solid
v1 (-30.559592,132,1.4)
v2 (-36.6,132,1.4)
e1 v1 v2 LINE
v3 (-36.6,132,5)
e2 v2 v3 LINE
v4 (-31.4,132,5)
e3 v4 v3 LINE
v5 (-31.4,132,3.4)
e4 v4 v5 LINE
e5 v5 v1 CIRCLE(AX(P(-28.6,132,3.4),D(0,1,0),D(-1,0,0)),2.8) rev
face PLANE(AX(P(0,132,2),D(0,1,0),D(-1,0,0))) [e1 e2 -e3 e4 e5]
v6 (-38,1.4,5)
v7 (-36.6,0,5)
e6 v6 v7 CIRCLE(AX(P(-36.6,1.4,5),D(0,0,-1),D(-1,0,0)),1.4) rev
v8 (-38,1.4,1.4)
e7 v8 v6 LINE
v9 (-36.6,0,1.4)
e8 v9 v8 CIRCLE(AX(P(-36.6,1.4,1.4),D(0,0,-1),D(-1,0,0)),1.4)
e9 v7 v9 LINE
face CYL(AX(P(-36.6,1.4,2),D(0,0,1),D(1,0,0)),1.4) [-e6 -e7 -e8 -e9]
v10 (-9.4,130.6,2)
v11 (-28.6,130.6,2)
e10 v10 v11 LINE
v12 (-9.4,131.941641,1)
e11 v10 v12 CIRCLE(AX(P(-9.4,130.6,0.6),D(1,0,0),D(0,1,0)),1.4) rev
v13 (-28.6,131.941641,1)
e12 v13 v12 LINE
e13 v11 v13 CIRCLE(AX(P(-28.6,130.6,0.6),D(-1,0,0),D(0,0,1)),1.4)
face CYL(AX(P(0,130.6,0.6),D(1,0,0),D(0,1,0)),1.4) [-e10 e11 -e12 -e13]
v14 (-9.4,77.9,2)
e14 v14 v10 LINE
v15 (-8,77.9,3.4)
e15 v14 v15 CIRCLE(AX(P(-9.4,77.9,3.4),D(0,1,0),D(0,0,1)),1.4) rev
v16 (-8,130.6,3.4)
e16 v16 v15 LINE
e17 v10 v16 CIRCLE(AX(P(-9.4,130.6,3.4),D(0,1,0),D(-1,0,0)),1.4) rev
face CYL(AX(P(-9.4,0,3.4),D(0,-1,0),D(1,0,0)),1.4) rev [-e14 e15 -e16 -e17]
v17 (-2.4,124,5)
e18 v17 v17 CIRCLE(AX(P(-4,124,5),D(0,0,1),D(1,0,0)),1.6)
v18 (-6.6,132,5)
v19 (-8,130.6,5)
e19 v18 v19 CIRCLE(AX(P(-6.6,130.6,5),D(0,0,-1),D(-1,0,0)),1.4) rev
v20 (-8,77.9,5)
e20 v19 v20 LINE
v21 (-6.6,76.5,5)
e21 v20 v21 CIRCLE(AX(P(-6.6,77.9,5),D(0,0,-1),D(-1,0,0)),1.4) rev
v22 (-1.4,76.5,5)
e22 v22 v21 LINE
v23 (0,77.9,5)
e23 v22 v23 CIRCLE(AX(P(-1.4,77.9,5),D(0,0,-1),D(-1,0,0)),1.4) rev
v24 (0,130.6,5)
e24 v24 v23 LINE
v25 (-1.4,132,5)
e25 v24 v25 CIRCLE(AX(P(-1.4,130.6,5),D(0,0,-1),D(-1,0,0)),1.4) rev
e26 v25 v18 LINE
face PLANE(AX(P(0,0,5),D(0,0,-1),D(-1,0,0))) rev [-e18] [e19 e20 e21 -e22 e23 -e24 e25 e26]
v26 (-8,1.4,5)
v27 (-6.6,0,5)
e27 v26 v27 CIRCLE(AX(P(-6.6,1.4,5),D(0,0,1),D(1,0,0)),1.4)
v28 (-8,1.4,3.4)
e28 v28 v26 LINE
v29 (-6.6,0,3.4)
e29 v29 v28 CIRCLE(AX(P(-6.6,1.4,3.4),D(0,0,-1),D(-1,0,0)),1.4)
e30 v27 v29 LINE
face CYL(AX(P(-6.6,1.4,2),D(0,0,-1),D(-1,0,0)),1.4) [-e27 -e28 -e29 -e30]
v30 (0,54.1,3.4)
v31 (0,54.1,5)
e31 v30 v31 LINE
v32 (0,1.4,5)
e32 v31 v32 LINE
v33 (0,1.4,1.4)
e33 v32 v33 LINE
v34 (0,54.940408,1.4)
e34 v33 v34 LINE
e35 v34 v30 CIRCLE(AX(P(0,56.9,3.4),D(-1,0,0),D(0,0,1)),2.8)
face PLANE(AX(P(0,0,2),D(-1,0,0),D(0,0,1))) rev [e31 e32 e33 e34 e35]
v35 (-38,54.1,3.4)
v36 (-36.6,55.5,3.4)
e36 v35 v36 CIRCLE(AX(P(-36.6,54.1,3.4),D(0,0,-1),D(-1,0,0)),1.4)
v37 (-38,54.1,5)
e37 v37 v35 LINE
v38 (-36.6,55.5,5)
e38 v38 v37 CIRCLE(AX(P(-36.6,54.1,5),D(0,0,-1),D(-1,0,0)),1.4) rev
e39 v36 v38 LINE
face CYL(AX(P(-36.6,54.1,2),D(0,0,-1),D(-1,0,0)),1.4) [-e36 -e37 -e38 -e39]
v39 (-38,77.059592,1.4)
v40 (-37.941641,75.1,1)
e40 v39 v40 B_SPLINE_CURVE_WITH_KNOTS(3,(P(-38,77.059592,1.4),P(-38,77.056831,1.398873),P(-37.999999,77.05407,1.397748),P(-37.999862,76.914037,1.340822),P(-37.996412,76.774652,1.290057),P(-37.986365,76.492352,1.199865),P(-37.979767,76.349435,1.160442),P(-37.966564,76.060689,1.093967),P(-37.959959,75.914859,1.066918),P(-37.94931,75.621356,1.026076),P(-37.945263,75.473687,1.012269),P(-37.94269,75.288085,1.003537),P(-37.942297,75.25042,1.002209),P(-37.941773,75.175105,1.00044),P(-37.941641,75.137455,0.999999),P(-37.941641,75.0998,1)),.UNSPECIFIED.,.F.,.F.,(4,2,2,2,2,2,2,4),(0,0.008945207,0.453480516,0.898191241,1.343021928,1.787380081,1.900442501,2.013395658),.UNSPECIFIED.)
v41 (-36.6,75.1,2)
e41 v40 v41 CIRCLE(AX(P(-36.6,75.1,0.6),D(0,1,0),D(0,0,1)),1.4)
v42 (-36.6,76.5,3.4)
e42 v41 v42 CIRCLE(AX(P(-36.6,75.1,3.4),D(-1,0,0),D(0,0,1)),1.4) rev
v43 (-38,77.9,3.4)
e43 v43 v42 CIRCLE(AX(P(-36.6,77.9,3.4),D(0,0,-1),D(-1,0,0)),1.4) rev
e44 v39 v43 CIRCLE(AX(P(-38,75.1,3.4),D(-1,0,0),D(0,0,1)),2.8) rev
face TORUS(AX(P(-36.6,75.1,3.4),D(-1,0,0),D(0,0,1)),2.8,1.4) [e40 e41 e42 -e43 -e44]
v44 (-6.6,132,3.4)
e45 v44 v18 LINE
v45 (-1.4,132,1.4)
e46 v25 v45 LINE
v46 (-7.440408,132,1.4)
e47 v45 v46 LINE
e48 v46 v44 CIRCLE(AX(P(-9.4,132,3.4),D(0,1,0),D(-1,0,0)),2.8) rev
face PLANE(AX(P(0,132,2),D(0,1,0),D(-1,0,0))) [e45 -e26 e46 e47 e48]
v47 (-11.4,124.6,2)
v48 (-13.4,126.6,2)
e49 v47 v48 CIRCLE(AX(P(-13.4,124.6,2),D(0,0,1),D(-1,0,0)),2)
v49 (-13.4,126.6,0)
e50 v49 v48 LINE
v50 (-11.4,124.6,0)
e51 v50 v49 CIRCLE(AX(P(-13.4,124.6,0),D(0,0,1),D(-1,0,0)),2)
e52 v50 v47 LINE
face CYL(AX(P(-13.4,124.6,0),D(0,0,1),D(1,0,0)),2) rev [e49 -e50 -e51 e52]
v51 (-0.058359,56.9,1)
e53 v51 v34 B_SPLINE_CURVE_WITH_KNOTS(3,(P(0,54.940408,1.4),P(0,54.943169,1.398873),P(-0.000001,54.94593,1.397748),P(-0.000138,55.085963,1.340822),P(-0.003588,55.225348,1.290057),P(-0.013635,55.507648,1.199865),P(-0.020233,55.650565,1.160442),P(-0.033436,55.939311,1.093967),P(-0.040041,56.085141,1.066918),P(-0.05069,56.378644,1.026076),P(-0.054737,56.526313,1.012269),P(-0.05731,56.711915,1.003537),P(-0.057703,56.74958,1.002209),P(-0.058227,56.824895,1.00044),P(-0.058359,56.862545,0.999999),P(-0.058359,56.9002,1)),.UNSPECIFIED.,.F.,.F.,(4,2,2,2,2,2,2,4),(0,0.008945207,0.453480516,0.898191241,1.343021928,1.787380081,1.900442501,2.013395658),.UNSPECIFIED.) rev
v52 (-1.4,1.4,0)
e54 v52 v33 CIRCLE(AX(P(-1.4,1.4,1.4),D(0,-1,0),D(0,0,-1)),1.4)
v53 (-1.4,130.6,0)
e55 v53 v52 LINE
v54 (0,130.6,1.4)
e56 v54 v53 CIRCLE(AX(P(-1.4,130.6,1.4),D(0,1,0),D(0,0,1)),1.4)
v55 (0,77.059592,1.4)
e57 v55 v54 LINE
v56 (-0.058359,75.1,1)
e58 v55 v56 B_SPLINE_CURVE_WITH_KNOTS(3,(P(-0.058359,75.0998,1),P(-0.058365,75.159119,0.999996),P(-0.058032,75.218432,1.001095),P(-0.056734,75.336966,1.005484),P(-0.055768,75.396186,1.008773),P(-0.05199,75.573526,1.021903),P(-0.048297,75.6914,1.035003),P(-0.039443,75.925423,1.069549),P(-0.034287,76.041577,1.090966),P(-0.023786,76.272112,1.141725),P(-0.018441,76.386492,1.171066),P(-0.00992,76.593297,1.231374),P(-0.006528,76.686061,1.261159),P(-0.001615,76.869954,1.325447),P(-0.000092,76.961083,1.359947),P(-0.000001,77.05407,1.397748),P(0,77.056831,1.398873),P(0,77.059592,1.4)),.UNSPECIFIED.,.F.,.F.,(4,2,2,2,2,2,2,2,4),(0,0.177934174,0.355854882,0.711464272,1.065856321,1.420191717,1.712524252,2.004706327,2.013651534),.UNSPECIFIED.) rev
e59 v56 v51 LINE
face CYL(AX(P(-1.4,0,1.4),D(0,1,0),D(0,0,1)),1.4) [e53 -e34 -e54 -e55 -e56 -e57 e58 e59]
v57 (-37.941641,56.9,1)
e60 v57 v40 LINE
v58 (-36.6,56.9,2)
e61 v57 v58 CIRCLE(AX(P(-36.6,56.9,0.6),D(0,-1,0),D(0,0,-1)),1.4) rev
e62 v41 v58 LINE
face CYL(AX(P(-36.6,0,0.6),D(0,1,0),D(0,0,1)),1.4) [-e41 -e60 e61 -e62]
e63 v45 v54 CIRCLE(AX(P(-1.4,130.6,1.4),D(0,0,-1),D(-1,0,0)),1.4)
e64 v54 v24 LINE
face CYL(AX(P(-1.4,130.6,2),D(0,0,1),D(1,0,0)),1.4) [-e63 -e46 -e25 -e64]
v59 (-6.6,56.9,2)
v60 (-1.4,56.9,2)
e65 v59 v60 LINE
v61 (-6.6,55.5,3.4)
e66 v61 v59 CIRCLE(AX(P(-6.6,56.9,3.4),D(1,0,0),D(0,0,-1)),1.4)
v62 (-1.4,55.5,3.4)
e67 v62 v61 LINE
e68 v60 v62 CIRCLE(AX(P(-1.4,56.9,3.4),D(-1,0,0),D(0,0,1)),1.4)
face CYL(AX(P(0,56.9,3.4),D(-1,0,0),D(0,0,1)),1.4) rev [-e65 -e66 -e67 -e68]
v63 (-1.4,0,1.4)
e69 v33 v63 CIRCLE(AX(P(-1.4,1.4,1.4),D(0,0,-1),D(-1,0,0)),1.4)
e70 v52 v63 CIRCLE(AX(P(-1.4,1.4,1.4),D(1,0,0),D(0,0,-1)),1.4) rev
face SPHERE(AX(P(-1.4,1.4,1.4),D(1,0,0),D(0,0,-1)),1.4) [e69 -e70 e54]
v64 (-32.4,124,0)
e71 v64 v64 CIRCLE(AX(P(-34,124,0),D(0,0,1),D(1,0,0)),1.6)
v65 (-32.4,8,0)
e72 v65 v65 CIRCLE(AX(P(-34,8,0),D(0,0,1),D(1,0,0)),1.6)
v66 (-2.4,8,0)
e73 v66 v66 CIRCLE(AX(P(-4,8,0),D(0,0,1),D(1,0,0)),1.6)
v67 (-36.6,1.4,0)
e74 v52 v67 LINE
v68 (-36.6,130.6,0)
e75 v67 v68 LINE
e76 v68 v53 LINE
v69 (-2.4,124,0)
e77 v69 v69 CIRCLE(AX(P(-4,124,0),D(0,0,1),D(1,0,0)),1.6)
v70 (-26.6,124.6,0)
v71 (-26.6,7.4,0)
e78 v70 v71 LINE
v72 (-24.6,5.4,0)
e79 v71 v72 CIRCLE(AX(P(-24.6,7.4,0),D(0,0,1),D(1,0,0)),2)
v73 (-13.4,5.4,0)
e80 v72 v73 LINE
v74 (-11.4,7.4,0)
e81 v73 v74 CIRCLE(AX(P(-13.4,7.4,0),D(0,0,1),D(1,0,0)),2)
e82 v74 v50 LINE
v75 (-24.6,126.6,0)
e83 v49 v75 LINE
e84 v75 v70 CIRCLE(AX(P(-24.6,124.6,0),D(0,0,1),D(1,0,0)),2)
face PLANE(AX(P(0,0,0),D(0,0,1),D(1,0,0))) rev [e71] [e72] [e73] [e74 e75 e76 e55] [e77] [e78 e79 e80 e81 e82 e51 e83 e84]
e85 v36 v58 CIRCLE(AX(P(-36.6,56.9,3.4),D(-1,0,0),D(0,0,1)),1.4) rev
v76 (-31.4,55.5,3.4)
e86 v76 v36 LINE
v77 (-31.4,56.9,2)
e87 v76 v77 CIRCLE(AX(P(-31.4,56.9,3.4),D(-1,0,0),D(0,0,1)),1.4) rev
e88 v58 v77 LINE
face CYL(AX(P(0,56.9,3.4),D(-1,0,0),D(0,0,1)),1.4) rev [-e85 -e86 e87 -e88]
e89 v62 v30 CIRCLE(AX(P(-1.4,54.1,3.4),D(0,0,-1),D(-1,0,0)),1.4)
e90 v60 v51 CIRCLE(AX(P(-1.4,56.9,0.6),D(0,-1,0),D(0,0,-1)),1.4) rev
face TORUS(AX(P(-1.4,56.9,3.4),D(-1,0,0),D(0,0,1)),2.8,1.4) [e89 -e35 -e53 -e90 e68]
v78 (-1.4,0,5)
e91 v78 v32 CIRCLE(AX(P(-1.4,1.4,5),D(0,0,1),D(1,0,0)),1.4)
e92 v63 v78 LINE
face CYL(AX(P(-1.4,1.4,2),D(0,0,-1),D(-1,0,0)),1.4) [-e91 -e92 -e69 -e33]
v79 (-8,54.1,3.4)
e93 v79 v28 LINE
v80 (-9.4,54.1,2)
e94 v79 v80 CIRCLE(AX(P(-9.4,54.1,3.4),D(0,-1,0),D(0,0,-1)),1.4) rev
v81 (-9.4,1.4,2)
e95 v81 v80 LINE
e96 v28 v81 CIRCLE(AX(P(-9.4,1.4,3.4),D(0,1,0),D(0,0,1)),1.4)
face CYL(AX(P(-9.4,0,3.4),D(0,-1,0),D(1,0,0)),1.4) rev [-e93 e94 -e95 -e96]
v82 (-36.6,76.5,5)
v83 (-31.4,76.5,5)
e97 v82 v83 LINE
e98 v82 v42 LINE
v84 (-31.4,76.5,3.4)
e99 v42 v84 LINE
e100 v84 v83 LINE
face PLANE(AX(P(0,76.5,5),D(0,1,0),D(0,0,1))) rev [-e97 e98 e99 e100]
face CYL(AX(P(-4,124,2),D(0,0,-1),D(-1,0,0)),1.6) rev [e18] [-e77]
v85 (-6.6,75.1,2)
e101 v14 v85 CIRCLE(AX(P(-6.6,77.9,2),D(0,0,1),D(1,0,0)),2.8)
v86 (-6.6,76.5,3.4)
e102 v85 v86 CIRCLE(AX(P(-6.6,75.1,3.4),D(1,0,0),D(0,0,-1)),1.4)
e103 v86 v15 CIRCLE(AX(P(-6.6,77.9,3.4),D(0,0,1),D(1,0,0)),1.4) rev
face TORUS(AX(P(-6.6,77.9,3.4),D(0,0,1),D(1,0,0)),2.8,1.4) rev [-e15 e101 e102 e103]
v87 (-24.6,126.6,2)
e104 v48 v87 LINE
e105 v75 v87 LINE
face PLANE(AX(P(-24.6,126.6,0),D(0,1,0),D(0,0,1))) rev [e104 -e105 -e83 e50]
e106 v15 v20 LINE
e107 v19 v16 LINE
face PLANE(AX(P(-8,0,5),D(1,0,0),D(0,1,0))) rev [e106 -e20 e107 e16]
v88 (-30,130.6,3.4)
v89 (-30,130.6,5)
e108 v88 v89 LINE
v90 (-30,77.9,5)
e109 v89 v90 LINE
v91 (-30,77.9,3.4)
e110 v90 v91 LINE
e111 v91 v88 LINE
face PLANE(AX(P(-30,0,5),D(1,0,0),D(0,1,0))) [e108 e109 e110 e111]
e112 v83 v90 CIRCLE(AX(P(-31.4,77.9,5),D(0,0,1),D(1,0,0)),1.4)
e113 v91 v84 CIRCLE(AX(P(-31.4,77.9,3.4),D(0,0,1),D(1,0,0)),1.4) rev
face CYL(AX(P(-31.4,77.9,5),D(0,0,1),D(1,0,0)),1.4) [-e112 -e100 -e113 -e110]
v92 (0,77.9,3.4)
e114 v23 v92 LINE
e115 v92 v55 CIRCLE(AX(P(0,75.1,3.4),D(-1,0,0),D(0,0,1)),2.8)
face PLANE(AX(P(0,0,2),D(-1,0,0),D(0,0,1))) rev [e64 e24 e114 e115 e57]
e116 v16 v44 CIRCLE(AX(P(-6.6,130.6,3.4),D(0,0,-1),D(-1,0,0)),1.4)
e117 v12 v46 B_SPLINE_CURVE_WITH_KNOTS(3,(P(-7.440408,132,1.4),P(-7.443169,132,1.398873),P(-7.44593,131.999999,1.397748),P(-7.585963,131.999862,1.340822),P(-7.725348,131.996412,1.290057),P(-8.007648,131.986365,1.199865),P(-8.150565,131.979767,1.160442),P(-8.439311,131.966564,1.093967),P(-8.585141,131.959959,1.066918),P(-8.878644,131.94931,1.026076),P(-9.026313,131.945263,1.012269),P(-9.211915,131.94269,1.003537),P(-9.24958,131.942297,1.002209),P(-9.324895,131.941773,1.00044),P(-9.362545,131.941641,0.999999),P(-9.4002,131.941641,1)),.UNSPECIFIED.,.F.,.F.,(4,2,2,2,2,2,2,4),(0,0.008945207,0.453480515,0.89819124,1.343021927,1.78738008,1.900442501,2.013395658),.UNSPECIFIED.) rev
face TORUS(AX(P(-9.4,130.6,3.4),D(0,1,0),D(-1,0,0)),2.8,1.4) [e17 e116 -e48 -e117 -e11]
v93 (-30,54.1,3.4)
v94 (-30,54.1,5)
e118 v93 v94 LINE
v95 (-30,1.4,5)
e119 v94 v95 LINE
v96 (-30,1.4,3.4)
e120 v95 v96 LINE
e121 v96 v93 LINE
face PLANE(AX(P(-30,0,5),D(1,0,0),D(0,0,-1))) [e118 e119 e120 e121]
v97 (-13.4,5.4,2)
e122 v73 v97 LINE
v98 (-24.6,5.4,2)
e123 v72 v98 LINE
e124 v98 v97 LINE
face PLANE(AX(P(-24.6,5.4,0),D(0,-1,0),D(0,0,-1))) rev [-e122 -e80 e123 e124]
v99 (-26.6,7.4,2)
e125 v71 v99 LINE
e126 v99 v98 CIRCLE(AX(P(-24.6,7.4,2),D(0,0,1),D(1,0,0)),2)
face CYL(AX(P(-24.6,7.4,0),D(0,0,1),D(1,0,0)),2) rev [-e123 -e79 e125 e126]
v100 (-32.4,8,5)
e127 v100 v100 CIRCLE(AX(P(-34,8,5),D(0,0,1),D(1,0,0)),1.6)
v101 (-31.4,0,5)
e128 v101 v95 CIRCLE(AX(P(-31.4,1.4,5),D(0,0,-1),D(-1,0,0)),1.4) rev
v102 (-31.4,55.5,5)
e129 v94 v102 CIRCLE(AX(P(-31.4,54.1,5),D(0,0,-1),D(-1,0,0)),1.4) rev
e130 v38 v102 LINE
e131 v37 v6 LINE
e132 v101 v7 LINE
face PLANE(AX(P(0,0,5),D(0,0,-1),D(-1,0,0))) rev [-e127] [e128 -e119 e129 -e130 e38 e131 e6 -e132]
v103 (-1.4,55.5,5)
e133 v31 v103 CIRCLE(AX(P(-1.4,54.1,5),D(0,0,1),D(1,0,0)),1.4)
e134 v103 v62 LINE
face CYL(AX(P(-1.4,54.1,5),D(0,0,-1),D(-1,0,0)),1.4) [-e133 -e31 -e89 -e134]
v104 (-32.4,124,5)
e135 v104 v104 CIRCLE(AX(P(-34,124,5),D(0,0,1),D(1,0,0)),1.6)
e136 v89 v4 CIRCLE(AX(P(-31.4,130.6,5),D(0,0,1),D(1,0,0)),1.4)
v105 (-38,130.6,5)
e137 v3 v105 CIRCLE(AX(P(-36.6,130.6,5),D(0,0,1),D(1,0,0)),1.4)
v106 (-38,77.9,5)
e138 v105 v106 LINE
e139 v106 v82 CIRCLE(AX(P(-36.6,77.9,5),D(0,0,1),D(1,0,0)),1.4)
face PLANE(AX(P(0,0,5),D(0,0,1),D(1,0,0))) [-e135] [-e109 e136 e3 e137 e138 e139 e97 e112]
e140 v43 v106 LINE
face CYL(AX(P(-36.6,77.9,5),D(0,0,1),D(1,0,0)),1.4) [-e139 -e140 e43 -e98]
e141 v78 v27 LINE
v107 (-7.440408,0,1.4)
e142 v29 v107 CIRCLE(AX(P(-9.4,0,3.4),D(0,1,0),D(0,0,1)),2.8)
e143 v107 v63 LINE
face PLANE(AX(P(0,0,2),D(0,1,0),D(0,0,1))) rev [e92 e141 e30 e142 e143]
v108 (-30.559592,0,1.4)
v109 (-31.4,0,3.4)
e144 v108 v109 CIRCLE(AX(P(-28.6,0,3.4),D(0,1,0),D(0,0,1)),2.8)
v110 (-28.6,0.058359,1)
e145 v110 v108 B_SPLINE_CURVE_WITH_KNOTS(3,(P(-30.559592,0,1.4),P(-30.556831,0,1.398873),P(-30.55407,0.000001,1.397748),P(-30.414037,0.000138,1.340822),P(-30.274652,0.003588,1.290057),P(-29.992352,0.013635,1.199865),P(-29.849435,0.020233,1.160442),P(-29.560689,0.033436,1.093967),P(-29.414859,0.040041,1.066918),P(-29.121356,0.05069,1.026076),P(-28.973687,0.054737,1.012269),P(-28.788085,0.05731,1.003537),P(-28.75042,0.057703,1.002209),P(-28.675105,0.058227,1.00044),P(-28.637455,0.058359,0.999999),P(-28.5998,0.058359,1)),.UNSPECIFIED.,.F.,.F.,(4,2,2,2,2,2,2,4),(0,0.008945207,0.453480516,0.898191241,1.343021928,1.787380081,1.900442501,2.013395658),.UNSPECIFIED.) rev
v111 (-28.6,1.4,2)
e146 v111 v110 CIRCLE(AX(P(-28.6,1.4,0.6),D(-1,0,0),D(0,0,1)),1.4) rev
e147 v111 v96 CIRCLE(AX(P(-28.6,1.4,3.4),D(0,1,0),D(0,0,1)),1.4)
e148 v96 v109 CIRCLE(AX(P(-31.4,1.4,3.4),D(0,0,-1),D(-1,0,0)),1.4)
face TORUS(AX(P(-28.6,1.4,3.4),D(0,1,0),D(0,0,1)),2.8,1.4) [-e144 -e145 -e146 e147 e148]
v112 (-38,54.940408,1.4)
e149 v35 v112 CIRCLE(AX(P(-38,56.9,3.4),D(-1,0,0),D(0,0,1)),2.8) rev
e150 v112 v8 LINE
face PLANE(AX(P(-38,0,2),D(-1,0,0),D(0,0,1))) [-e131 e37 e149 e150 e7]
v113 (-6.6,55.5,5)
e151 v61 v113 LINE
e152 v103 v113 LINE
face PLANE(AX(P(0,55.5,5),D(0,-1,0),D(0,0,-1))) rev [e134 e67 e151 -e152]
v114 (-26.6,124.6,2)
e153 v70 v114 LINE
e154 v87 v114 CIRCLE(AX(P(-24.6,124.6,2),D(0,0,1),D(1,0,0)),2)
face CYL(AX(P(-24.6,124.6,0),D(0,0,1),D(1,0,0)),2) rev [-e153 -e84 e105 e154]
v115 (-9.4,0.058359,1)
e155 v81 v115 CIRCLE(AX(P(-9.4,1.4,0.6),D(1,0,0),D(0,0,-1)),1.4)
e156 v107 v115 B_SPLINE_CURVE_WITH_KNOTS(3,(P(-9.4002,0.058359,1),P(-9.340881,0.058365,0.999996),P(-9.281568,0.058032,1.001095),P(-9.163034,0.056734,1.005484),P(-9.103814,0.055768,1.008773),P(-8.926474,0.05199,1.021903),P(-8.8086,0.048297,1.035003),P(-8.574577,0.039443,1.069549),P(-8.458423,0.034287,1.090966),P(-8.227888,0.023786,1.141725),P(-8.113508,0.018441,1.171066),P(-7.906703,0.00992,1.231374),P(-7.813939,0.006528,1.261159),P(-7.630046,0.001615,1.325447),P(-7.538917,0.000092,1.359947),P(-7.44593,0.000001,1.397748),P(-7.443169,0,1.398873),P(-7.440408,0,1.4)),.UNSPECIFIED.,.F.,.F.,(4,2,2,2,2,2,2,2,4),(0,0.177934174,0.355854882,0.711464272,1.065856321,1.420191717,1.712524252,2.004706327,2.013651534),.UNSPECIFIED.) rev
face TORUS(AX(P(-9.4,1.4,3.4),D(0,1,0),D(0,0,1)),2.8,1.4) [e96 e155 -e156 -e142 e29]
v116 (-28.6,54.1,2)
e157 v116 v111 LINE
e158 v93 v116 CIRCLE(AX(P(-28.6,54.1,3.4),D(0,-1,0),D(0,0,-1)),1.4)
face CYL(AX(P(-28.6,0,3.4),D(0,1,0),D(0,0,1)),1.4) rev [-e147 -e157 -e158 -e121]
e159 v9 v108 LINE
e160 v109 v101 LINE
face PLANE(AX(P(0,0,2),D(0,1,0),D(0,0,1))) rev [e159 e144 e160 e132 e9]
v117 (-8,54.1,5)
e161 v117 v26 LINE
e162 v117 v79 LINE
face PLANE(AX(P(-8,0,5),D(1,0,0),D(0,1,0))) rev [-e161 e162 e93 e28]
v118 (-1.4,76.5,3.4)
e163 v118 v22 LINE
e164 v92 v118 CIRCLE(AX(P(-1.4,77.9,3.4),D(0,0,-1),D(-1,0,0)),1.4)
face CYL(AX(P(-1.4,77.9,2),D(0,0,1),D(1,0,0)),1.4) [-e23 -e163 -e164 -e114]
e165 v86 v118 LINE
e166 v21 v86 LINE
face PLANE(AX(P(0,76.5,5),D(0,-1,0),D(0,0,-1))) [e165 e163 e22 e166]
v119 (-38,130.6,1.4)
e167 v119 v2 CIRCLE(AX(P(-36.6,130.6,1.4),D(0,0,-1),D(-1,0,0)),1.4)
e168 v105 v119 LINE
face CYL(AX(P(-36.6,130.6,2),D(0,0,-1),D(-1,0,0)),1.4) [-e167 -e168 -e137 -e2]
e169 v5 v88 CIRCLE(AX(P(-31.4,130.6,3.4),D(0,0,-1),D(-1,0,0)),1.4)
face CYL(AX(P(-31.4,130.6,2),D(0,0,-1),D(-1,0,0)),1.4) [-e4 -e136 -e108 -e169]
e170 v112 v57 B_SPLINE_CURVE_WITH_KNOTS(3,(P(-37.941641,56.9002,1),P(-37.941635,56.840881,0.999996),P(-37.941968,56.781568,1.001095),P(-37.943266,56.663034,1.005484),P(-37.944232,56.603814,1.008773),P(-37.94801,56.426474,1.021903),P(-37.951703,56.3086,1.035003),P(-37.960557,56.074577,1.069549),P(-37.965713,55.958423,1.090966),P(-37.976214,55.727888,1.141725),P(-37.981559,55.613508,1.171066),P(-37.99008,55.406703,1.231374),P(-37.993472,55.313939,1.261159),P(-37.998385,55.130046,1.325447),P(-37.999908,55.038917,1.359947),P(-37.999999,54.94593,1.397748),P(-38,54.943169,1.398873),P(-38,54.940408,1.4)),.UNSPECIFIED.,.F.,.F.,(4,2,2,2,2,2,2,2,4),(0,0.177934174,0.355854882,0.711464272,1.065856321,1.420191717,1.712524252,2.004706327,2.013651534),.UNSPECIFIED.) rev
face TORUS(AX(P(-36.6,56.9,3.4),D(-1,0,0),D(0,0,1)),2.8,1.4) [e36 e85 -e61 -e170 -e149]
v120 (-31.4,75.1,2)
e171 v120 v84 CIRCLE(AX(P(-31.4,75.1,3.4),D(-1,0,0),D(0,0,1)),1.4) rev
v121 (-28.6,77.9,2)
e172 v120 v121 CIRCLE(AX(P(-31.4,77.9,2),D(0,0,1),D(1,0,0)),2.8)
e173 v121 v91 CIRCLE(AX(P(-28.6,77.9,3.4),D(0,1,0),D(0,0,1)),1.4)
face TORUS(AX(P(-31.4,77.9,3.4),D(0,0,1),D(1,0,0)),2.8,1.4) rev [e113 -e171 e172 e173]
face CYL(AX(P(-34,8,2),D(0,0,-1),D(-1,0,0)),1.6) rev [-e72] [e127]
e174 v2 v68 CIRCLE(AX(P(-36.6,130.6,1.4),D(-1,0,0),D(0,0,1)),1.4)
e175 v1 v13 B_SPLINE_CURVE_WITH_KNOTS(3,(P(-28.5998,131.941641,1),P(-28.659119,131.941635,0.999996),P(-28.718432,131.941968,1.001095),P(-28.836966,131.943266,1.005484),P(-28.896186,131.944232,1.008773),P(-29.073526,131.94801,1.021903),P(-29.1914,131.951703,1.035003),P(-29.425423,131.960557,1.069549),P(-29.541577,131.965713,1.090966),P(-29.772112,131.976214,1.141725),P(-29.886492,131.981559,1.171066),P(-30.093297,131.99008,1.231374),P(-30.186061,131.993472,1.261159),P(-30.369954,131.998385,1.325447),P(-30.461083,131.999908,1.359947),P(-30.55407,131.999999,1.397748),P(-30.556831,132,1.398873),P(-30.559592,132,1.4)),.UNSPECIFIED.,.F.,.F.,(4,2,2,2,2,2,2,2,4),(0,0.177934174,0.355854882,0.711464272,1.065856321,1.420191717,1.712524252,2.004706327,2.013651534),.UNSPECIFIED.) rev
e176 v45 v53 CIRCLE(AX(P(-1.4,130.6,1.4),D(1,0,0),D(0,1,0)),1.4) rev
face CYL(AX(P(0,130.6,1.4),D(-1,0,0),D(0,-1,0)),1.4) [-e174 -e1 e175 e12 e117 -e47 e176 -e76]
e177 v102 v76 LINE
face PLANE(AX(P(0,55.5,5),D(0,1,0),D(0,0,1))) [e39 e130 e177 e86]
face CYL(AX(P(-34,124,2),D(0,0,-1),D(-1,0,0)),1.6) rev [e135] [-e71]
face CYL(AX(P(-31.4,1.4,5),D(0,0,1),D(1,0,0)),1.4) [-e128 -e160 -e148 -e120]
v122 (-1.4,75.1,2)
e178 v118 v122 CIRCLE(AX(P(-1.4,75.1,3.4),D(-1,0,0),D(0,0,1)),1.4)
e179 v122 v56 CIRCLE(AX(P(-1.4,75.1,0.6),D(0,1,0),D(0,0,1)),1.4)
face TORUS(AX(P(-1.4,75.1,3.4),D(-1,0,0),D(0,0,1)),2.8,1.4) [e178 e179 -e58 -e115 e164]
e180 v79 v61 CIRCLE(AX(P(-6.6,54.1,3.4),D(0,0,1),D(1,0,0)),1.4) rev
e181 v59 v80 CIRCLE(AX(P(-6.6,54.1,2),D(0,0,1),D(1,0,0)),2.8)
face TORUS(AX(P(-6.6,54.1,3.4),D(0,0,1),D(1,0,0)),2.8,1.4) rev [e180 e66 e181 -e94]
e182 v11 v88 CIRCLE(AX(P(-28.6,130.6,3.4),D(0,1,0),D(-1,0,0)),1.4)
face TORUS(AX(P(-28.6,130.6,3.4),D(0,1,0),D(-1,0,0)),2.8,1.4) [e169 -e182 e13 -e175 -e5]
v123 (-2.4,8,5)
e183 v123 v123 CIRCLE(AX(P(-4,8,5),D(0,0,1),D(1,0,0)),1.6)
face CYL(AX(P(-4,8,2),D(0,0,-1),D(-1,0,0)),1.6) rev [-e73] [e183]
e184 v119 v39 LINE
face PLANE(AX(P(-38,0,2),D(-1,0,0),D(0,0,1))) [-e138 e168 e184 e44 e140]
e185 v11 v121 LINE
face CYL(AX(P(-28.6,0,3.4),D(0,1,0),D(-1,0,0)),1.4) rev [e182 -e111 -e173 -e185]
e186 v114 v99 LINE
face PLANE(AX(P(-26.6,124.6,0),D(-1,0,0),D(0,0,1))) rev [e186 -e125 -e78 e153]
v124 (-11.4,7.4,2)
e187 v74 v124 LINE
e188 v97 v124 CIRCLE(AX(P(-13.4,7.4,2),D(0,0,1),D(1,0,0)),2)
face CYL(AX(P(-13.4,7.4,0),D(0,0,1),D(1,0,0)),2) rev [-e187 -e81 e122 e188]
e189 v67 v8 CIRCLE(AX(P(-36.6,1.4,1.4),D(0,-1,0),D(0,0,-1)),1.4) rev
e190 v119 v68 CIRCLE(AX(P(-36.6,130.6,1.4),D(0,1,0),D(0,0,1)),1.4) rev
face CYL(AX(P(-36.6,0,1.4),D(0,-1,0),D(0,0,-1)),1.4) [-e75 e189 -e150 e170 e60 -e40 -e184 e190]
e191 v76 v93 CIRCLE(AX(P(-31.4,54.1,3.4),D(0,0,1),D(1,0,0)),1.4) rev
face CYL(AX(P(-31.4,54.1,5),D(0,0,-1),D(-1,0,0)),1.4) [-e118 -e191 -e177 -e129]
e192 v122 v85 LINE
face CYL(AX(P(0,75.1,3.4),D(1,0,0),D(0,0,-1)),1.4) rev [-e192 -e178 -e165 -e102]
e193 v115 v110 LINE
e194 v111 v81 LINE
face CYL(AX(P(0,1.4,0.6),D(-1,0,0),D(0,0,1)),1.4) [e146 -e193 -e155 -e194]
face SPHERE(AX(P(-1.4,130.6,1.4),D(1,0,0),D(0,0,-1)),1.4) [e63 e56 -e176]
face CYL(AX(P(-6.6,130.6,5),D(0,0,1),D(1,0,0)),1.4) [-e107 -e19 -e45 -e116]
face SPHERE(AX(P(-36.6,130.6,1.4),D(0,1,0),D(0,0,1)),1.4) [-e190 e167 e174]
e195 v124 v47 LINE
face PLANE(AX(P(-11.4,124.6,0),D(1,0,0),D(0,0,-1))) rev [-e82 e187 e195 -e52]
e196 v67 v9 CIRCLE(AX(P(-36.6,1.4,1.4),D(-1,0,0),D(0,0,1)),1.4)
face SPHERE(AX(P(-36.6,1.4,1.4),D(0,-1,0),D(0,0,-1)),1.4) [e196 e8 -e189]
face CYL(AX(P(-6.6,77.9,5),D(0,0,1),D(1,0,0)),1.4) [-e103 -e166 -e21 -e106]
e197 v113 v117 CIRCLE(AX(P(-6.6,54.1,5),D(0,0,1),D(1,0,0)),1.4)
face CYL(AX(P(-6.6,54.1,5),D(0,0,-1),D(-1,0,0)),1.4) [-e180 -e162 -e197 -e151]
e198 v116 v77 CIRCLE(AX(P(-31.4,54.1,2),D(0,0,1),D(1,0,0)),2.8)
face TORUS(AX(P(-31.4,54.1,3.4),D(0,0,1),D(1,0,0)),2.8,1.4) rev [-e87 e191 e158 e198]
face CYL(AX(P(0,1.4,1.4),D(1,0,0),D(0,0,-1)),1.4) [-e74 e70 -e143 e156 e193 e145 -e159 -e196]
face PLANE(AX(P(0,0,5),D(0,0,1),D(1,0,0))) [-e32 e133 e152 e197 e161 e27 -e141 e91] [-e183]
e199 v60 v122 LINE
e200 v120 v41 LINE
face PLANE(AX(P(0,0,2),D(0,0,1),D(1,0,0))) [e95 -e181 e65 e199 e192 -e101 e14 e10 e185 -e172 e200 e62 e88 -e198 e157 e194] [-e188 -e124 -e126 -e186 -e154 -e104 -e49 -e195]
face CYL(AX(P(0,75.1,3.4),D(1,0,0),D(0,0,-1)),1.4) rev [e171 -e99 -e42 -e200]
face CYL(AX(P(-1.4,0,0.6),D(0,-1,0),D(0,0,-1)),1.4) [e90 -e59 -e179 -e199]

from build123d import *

# Parameters (mm, degrees)
SKETCH1_W           = 55.5
SKETCH1_H           = 8
SKETCH1_R           = 1.6
BOSS_EXTRUDE1_DEPTH = 2
BOSS_EXTRUDE2_START = 2
SKETCH1_3_W         = 55.5
SKETCH1_3_H         = 8
SKETCH1_3_R         = 1.6
BOSS_EXTRUDE2_DEPTH = 3
FILLET1_R           = 1.4
CUT_EXTRUDE1_DEPTH  = 138.393595317


with BuildPart() as part:
    # Sketch1 → Boss-Extrude1 (new body)
    # profile 1 of 5: a face of its own
    with BuildSketch(Plane(origin=(0, 0, 0), x_dir=(0, 1, 0), z_dir=(0, 0, 1))):
        Polygon((76.5, 38), (55.5, 38), (55.5, 30), (0, 30), (0, 8), (55.5, 8), (55.5, 0), (76.5, 0), (76.5, 8), (132, 8), (132, 30), (76.5, 30), align=None)
    # profile 2 of 5: a face of its own
    with BuildSketch(Plane(origin=(0, 0, 0), x_dir=(0, 1, 0), z_dir=(0, 0, 1))):
        with Locations((27.75, 34)):
            Rectangle(SKETCH1_W, SKETCH1_H)
        with Locations(Location((8, 34, 0), (0, 0, 270))):
            Circle(SKETCH1_R, mode=Mode.SUBTRACT)
    # profile 3 of 5: a face of its own
    with BuildSketch(Plane(origin=(0, 0, 0), x_dir=(0, 1, 0), z_dir=(0, 0, 1))):
        with Locations((104.25, 34)):
            Rectangle(SKETCH1_W, SKETCH1_H)
        with Locations(Location((124, 34, 0), (0, 0, 270))):
            Circle(SKETCH1_R, mode=Mode.SUBTRACT)
    # profile 4 of 5: a face of its own
    with BuildSketch(Plane(origin=(0, 0, 0), x_dir=(0, 1, 0), z_dir=(0, 0, 1))):
        with Locations((104.25, 4)):
            Rectangle(SKETCH1_W, SKETCH1_H)
        with Locations(Location((124, 4, 0), (0, 0, 270))):
            Circle(SKETCH1_R, mode=Mode.SUBTRACT)
    # profile 5 of 5: a face of its own
    with BuildSketch(Plane(origin=(0, 0, 0), x_dir=(0, 1, 0), z_dir=(0, 0, 1))):
        with Locations((27.75, 4)):
            Rectangle(SKETCH1_W, SKETCH1_H)
        with Locations(Location((8, 4, 0), (0, 0, 270))):
            Circle(SKETCH1_R, mode=Mode.SUBTRACT)
    extrude(amount=BOSS_EXTRUDE1_DEPTH)

    # Sketch1<3> → Boss-Extrude2 (add)
    # profile 1 of 4: a face of its own
    with BuildSketch(Plane(origin=(0, 0, 0), x_dir=(0, 1, 0), z_dir=(0, 0, 1)).offset(BOSS_EXTRUDE2_START)):
        with Locations((27.75, 34)):
            Rectangle(SKETCH1_3_W, SKETCH1_3_H)
        with Locations(Location((8, 34, 0), (0, 0, 270))):
            Circle(SKETCH1_3_R, mode=Mode.SUBTRACT)
    # profile 2 of 4: a face of its own
    with BuildSketch(Plane(origin=(0, 0, 0), x_dir=(0, 1, 0), z_dir=(0, 0, 1)).offset(BOSS_EXTRUDE2_START)):
        with Locations((104.25, 34)):
            Rectangle(SKETCH1_3_W, SKETCH1_3_H)
        with Locations(Location((124, 34, 0), (0, 0, 270))):
            Circle(SKETCH1_3_R, mode=Mode.SUBTRACT)
    # profile 3 of 4: a face of its own
    with BuildSketch(Plane(origin=(0, 0, 0), x_dir=(0, 1, 0), z_dir=(0, 0, 1)).offset(BOSS_EXTRUDE2_START)):
        with Locations((104.25, 4)):
            Rectangle(SKETCH1_3_W, SKETCH1_3_H)
        with Locations(Location((124, 4, 0), (0, 0, 270))):
            Circle(SKETCH1_3_R, mode=Mode.SUBTRACT)
    # profile 4 of 4: a face of its own
    with BuildSketch(Plane(origin=(0, 0, 0), x_dir=(0, 1, 0), z_dir=(0, 0, 1)).offset(BOSS_EXTRUDE2_START)):
        with Locations((27.75, 4)):
            Rectangle(SKETCH1_3_W, SKETCH1_3_H)
        with Locations(Location((8, 4, 0), (0, 0, 270))):
            Circle(SKETCH1_3_R, mode=Mode.SUBTRACT)
    extrude(amount=BOSS_EXTRUDE2_DEPTH)

    # Fillet1
    # the kernel refuses this fillet: 1.4 mm, written as the material it takes off along each edge
    with BuildSketch(Plane(origin=(-1.4, 130.6, 1.4), x_dir=(1, 0, 0), z_dir=(0, 1, 0))) as fillet1_piece_1_section:
        Polygon((0, 0), (FILLET1_R, 0), (FILLET1_R, FILLET1_R), (0, FILLET1_R), align=None)
    fillet1_piece_1 = extrude(amount=FILLET1_R, mode=Mode.PRIVATE)
    fillet1_piece_1 = fillet1_piece_1 - Plane(origin=(-1.4, 130.6, 1.4), x_dir=(-0.7071067811865475, 0, 0.7071067811865475), z_dir=(0, 1, 0)) * Sphere(FILLET1_R, mode=Mode.PRIVATE)
    with BuildSketch(Plane(origin=(-36.6, 130.6, 1.4), x_dir=(-1, 0, 0), z_dir=(0, 1, 0))) as fillet1_piece_2_section:
        Polygon((0, 0), (FILLET1_R, 0), (FILLET1_R, -FILLET1_R), (0, -FILLET1_R), align=None)
    fillet1_piece_2 = extrude(amount=FILLET1_R, mode=Mode.PRIVATE)
    fillet1_piece_2 = fillet1_piece_2 - Plane(origin=(-36.6, 130.6, 1.4), x_dir=(0.7071067811865475, 0, 0.7071067811865475), z_dir=(0, 1, 0)) * Sphere(FILLET1_R, mode=Mode.PRIVATE)
    with BuildSketch(Plane(origin=(-1.4, 1.4, 1.4), x_dir=(1, 0, 0), z_dir=(0, -1, 0))) as fillet1_piece_3_section:
        Polygon((0, 0), (FILLET1_R, 0), (FILLET1_R, -FILLET1_R), (0, -FILLET1_R), align=None)
    fillet1_piece_3 = extrude(amount=FILLET1_R, mode=Mode.PRIVATE)
    fillet1_piece_3 = fillet1_piece_3 - Plane(origin=(-1.4, 1.4, 1.4), x_dir=(-0.7071067811865475, 0, 0.7071067811865475), z_dir=(0, -1, 0)) * Sphere(FILLET1_R, mode=Mode.PRIVATE)
    with BuildSketch(Plane(origin=(-36.6, 1.4, 1.4), x_dir=(-1, 0, 0), z_dir=(0, -1, 0))) as fillet1_piece_4_section:
        Polygon((0, 0), (FILLET1_R, 0), (FILLET1_R, FILLET1_R), (0, FILLET1_R), align=None)
    fillet1_piece_4 = extrude(amount=FILLET1_R, mode=Mode.PRIVATE)
    fillet1_piece_4 = fillet1_piece_4 - Plane(origin=(-36.6, 1.4, 1.4), x_dir=(0.7071067811865475, 0, 0.7071067811865475), z_dir=(0, -1, 0)) * Sphere(FILLET1_R, mode=Mode.PRIVATE)
    with BuildSketch(Plane(origin=(-1.4, 132, 0), x_dir=(0, -1, 0), z_dir=(-1, 0, 0))) as fillet1_piece_5:
        with BuildLine():
            CenterArc((FILLET1_R, FILLET1_R), FILLET1_R, 180, 90)
            Line((0, FILLET1_R), (0, 0))
            Line((0, 0), (FILLET1_R, 0))
        make_face()
    fillet1_piece_5_solid = extrude(amount=35.2, mode=Mode.PRIVATE)
    with BuildSketch(Plane(origin=(0, 1.4, 0), x_dir=(-1, 0, 0), z_dir=(0, 1, 0)), Plane(origin=(-38, 130.6, 0), x_dir=(1, 0, 0), z_dir=(0, -1, 0))) as fillet1_piece_6:
        with BuildLine():
            CenterArc((FILLET1_R, FILLET1_R), FILLET1_R, 180, 90)
            Line((0, FILLET1_R), (0, 0))
            Line((0, 0), (FILLET1_R, 0))
        make_face()
    fillet1_piece_6_solid = extrude(amount=129.2, mode=Mode.PRIVATE)
    with BuildSketch(Plane(origin=(-36.6, 0, 0), x_dir=(0, 0, 1), z_dir=(1, 0, 0))) as fillet1_piece_7:
        with BuildLine():
            CenterArc((FILLET1_R, -FILLET1_R), FILLET1_R, 90, 90)
            Line((0, -FILLET1_R), (0, 0))
            Line((0, 0), (FILLET1_R, 0))
        make_face()
    fillet1_piece_7_solid = extrude(amount=35.2, mode=Mode.PRIVATE)
    with BuildSketch(Plane(origin=(-38, 132, 8.5), x_dir=(1, 0, 0), z_dir=(0, 0, -1)), Plane(origin=(0, 132, 8.5), x_dir=(0, -1, 0), z_dir=(0, 0, -1)), Plane(origin=(0, 0, 8.5), x_dir=(-1, 0, 0), z_dir=(0, 0, -1)), Plane(origin=(-38, 0, 1.4), x_dir=(1, 0, 0), z_dir=(0, 0, 1))) as fillet1_piece_8:
        with BuildLine():
            CenterArc((FILLET1_R, FILLET1_R), FILLET1_R, 180, 90)
            Line((0, FILLET1_R), (0, 0))
            Line((0, 0), (FILLET1_R, 0))
        make_face()
    fillet1_piece_8_solid = extrude(amount=7.1, mode=Mode.PRIVATE)
    with BuildSketch(Plane(origin=(-8, 55.5, 2), x_dir=(0, -1, 0), z_dir=(0, 0, 1)), Plane(origin=(-8, 76.5, 2), x_dir=(1, 0, 0), z_dir=(0, 0, 1)), Plane(origin=(-30, 76.5, 2), x_dir=(0, 1, 0), z_dir=(0, 0, 1)), Plane(origin=(-30, 55.5, 2), x_dir=(-1, 0, 0), z_dir=(0, 0, 1))) as fillet1_piece_9:
        with BuildLine():
            CenterArc((FILLET1_R, FILLET1_R), FILLET1_R, 180, 90)
            Line((0, FILLET1_R), (0, 0))
            Line((0, 0), (FILLET1_R, 0))
        make_face()
    fillet1_piece_9_solid = extrude(amount=6.5, mode=Mode.PRIVATE)
    add([fillet1_piece_1, fillet1_piece_2, fillet1_piece_3, fillet1_piece_4, fillet1_piece_5_solid, fillet1_piece_6_solid, fillet1_piece_7_solid, fillet1_piece_8_solid, fillet1_piece_9_solid], mode=Mode.SUBTRACT)
    # the kernel refuses this fillet: 1.4 mm, written as the material it adds along each edge
    with BuildSketch(Plane(origin=(0, 55.5, 2), x_dir=(0, 1, 0), z_dir=(-1, 0, 0)), Plane(origin=(-6.6, 76.5, 2), x_dir=(0, -1, 0), z_dir=(1, 0, 0)), Plane(origin=(-38, 76.5, 2), x_dir=(0, -1, 0), z_dir=(1, 0, 0)), Plane(origin=(-31.4, 55.5, 2), x_dir=(0, 1, 0), z_dir=(-1, 0, 0))) as fillet1_2_piece_1:
        with BuildLine():
            CenterArc((FILLET1_R, -FILLET1_R), FILLET1_R, 90, 90)
            Line((0, -FILLET1_R), (0, 0))
            Line((0, 0), (FILLET1_R, 0))
        make_face()
    fillet1_2_piece_1_solid = extrude(amount=6.6, mode=Mode.PRIVATE)
    with BuildSketch(Plane(origin=(-8, 54.1, 2), x_dir=(-1, 0, 0), z_dir=(0, -1, 0)), Plane(origin=(-8, 132, 2), x_dir=(-1, 0, 0), z_dir=(0, -1, 0)), Plane(origin=(-30, 77.9, 2), x_dir=(1, 0, 0), z_dir=(0, 1, 0)), Plane(origin=(-30, 0, 2), x_dir=(1, 0, 0), z_dir=(0, 1, 0))) as fillet1_2_piece_2:
        with BuildLine():
            CenterArc((FILLET1_R, -FILLET1_R), FILLET1_R, 90, 90)
            Line((0, -FILLET1_R), (0, 0))
            Line((0, 0), (FILLET1_R, 0))
        make_face()
    fillet1_2_piece_2_solid = extrude(amount=54.1, mode=Mode.PRIVATE)
    with BuildSketch(Plane(origin=(-31.4, 54.1, 2), x_dir=(0, 1, 0), z_dir=(-1, 0, 0))) as fillet1_2_piece_3:
        with BuildLine():
            CenterArc((1.4 + FILLET1_R, -FILLET1_R), FILLET1_R, 90, 90)
            Line((1.4, -FILLET1_R), (1.4, 0))
            Line((1.4, 0), (1.4 + FILLET1_R, 0))
        make_face()
    fillet1_2_piece_3_solid = revolve(axis=Axis((-31.4, 54.1, 2), (0, 0, -1)), revolution_arc=90, mode=Mode.PRIVATE)
    with BuildSketch(Plane(origin=(-31.4, 77.9, 2), x_dir=(1, 0, 0), z_dir=(0, 1, 0))) as fillet1_2_piece_4:
        with BuildLine():
            CenterArc((1.4 + FILLET1_R, -FILLET1_R), FILLET1_R, 90, 90)
            Line((1.4, -FILLET1_R), (1.4, 0))
            Line((1.4, 0), (1.4 + FILLET1_R, 0))
        make_face()
    fillet1_2_piece_4_solid = revolve(axis=Axis((-31.4, 77.9, 2), (0, 0, -1)), revolution_arc=90, mode=Mode.PRIVATE)
    with BuildSketch(Plane(origin=(-6.6, 77.9, 2), x_dir=(0, -1, 0), z_dir=(1, 0, 0))) as fillet1_2_piece_5:
        with BuildLine():
            CenterArc((1.4 + FILLET1_R, -FILLET1_R), FILLET1_R, 90, 90)
            Line((1.4, -FILLET1_R), (1.4, 0))
            Line((1.4, 0), (1.4 + FILLET1_R, 0))
        make_face()
    fillet1_2_piece_5_solid = revolve(axis=Axis((-6.6, 77.9, 2), (0, 0, -1)), revolution_arc=90, mode=Mode.PRIVATE)
    with BuildSketch(Plane(origin=(-6.6, 54.1, 2), x_dir=(-1, 0, 0), z_dir=(0, -1, 0))) as fillet1_2_piece_6:
        with BuildLine():
            CenterArc((1.4 + FILLET1_R, -FILLET1_R), FILLET1_R, 90, 90)
            Line((1.4, -FILLET1_R), (1.4, 0))
            Line((1.4, 0), (1.4 + FILLET1_R, 0))
        make_face()
    fillet1_2_piece_6_solid = revolve(axis=Axis((-6.6, 54.1, 2), (0, 0, -1)), revolution_arc=90, mode=Mode.PRIVATE)
    add([fillet1_2_piece_1_solid, fillet1_2_piece_2_solid, fillet1_2_piece_3_solid, fillet1_2_piece_4_solid, fillet1_2_piece_5_solid, fillet1_2_piece_6_solid])
    # the kernel refuses this fillet: 1.4 mm, written as the material it takes off along each edge
    with BuildSketch(Plane(origin=(-38, 75.1, 2), x_dir=(1, 0, 0), z_dir=(0, -1, 0)), Plane(origin=(0, 56.9, 2), x_dir=(-1, 0, 0), z_dir=(0, 1, 0))) as fillet1_3_piece_1:
        with BuildLine():
            CenterArc((FILLET1_R, -FILLET1_R), FILLET1_R, 90, 90)
            Line((0, -FILLET1_R), (0, 0))
            Line((0, 0), (FILLET1_R, 0))
        make_face()
    fillet1_3_piece_1_solid = extrude(amount=18.2, mode=Mode.PRIVATE)
    with BuildSketch(Plane(origin=(-28.6, 0, 2), x_dir=(0, 1, 0), z_dir=(1, 0, 0)), Plane(origin=(-9.4, 132, 2), x_dir=(0, -1, 0), z_dir=(-1, 0, 0))) as fillet1_3_piece_2:
        with BuildLine():
            CenterArc((FILLET1_R, -FILLET1_R), FILLET1_R, 90, 90)
            Line((0, -FILLET1_R), (0, 0))
            Line((0, 0), (FILLET1_R, 0))
        make_face()
    fillet1_3_piece_2_solid = extrude(amount=19.2, mode=Mode.PRIVATE)
    with BuildSketch(Plane(origin=(-8, 0, 3.4), x_dir=(1, 0, 0), z_dir=(0, 0, 1)), Plane(origin=(0, 76.5, 3.4), x_dir=(0, 1, 0), z_dir=(0, 0, 1)), Plane(origin=(-30, 132, 3.4), x_dir=(-1, 0, 0), z_dir=(0, 0, 1)), Plane(origin=(-38, 55.5, 3.4), x_dir=(0, -1, 0), z_dir=(0, 0, 1))) as fillet1_3_piece_3:
        with BuildLine():
            CenterArc((FILLET1_R, FILLET1_R), FILLET1_R, 180, 90)
            Line((0, FILLET1_R), (0, 0))
            Line((0, 0), (FILLET1_R, 0))
        make_face()
    fillet1_3_piece_3_solid = extrude(amount=5.1, mode=Mode.PRIVATE)
    with BuildSketch(Plane(origin=(0, 55.5, 3.4), x_dir=(0, -1, 0), z_dir=(0, 0, 1)), Plane(origin=(-8, 132, 3.4), x_dir=(1, 0, 0), z_dir=(0, 0, 1)), Plane(origin=(-38, 76.5, 3.4), x_dir=(0, 1, 0), z_dir=(0, 0, 1)), Plane(origin=(-30, 0, 3.4), x_dir=(-1, 0, 0), z_dir=(0, 0, 1))) as fillet1_3_piece_4:
        with BuildLine():
            CenterArc((FILLET1_R, -FILLET1_R), FILLET1_R, 90, 90)
            Line((0, -FILLET1_R), (0, 0))
            Line((0, 0), (FILLET1_R, 0))
        make_face()
    fillet1_3_piece_4_solid = extrude(amount=5.1, mode=Mode.PRIVATE)
    with BuildSketch(Plane(origin=(-28.6, 0, 3.4), x_dir=(0, 0, -1), z_dir=(1, 0, 0))) as fillet1_3_piece_5:
        with BuildLine():
            CenterArc((1.4 + FILLET1_R, FILLET1_R), FILLET1_R, 180, 90)
            Line((1.4 + FILLET1_R, 0), (1.4, 0))
            Line((1.4, 0), (1.4, FILLET1_R))
        make_face()
    fillet1_3_piece_5_solid = revolve(axis=Axis((-28.6, 0, 3.4), (0, 1, 0)), revolution_arc=90, mode=Mode.PRIVATE)
    with BuildSketch(Plane(origin=(-38, 56.9, 3.4), x_dir=(0, 0, -1), z_dir=(0, 1, 0))) as fillet1_3_piece_6:
        with BuildLine():
            CenterArc((1.4 + FILLET1_R, -FILLET1_R), FILLET1_R, 90, 90)
            Line((1.4 + FILLET1_R, 0), (1.4, 0))
            Line((1.4, 0), (1.4, -FILLET1_R))
        make_face()
    fillet1_3_piece_6_solid = revolve(axis=Axis((-38, 56.9, 3.4), (-1, 0, 0)), revolution_arc=90, mode=Mode.PRIVATE)
    with BuildSketch(Plane(origin=(-38, 75.1, 3.4), x_dir=(0, 0, -1), z_dir=(0, -1, 0))) as fillet1_3_piece_7:
        with BuildLine():
            CenterArc((1.4 + FILLET1_R, FILLET1_R), FILLET1_R, 180, 90)
            Line((1.4, FILLET1_R), (1.4, 0))
            Line((1.4, 0), (1.4 + FILLET1_R, 0))
        make_face()
    fillet1_3_piece_7_solid = revolve(axis=Axis((-38, 75.1, 3.4), (1, 0, 0)), revolution_arc=90, mode=Mode.PRIVATE)
    with BuildSketch(Plane(origin=(-28.6, 132, 3.4), x_dir=(0, 0, -1), z_dir=(1, 0, 0))) as fillet1_3_piece_8:
        with BuildLine():
            CenterArc((1.4 + FILLET1_R, -FILLET1_R), FILLET1_R, 90, 90)
            Line((1.4 + FILLET1_R, 0), (1.4, 0))
            Line((1.4, 0), (1.4, -FILLET1_R))
        make_face()
    fillet1_3_piece_8_solid = revolve(axis=Axis((-28.6, 132, 3.4), (0, 1, 0)), revolution_arc=90, mode=Mode.PRIVATE)
    with BuildSketch(Plane(origin=(-9.4, 132, 3.4), x_dir=(0, 0, -1), z_dir=(-1, 0, 0))) as fillet1_3_piece_9:
        with BuildLine():
            CenterArc((1.4 + FILLET1_R, FILLET1_R), FILLET1_R, 180, 90)
            Line((1.4, FILLET1_R), (1.4, 0))
            Line((1.4, 0), (1.4 + FILLET1_R, 0))
        make_face()
    fillet1_3_piece_9_solid = revolve(axis=Axis((-9.4, 132, 3.4), (0, -1, 0)), revolution_arc=90, mode=Mode.PRIVATE)
    with BuildSketch(Plane(origin=(0, 75.1, 3.4), x_dir=(0, 0, -1), z_dir=(0, -1, 0))) as fillet1_3_piece_10:
        with BuildLine():
            CenterArc((1.4 + FILLET1_R, -FILLET1_R), FILLET1_R, 90, 90)
            Line((1.4 + FILLET1_R, 0), (1.4, 0))
            Line((1.4, 0), (1.4, -FILLET1_R))
        make_face()
    fillet1_3_piece_10_solid = revolve(axis=Axis((0, 75.1, 3.4), (1, 0, 0)), revolution_arc=90, mode=Mode.PRIVATE)
    with BuildSketch(Plane(origin=(0, 56.9, 3.4), x_dir=(0, 0, -1), z_dir=(0, 1, 0))) as fillet1_3_piece_11:
        with BuildLine():
            CenterArc((1.4 + FILLET1_R, FILLET1_R), FILLET1_R, 180, 90)
            Line((1.4, FILLET1_R), (1.4, 0))
            Line((1.4, 0), (1.4 + FILLET1_R, 0))
        make_face()
    fillet1_3_piece_11_solid = revolve(axis=Axis((0, 56.9, 3.4), (-1, 0, 0)), revolution_arc=90, mode=Mode.PRIVATE)
    with BuildSketch(Plane(origin=(-9.4, 0, 3.4), x_dir=(0, 0, -1), z_dir=(-1, 0, 0))) as fillet1_3_piece_12:
        with BuildLine():
            CenterArc((1.4 + FILLET1_R, -FILLET1_R), FILLET1_R, 90, 90)
            Line((1.4 + FILLET1_R, 0), (1.4, 0))
            Line((1.4, 0), (1.4, -FILLET1_R))
        make_face()
    fillet1_3_piece_12_solid = revolve(axis=Axis((-9.4, 0, 3.4), (0, -1, 0)), revolution_arc=90, mode=Mode.PRIVATE)
    add([fillet1_3_piece_1_solid, fillet1_3_piece_2_solid, fillet1_3_piece_3_solid, fillet1_3_piece_4_solid, fillet1_3_piece_5_solid, fillet1_3_piece_6_solid, fillet1_3_piece_7_solid, fillet1_3_piece_8_solid, fillet1_3_piece_9_solid, fillet1_3_piece_10_solid, fillet1_3_piece_11_solid, fillet1_3_piece_12_solid], mode=Mode.SUBTRACT)

    # Sketch2 → Cut-Extrude1 (cut, through all)
    with BuildSketch(Plane.XY.offset(2)):
        with BuildLine():
            Line((-24.6, 126.6), (-13.4, 126.6))
            ThreePointArc((-13.4, 126.6), (-11.985786438, 126.014213562), (-11.4, 124.6))
            Line((-11.4, 124.6), (-11.4, 7.4))
            ThreePointArc((-11.4, 7.4), (-11.985786438, 5.985786438), (-13.4, 5.4))
            Line((-13.4, 5.4), (-24.6, 5.4))
            ThreePointArc((-24.6, 5.4), (-26.014213562, 5.985786438), (-26.6, 7.4))
            Line((-26.6, 7.4), (-26.6, 124.6))
            ThreePointArc((-26.6, 124.6), (-26.014213562, 126.014213562), (-24.6, 126.6))
        make_face()
    extrude(amount=-CUT_EXTRUDE1_DEPTH, mode=Mode.SUBTRACT)


solid = part.part
